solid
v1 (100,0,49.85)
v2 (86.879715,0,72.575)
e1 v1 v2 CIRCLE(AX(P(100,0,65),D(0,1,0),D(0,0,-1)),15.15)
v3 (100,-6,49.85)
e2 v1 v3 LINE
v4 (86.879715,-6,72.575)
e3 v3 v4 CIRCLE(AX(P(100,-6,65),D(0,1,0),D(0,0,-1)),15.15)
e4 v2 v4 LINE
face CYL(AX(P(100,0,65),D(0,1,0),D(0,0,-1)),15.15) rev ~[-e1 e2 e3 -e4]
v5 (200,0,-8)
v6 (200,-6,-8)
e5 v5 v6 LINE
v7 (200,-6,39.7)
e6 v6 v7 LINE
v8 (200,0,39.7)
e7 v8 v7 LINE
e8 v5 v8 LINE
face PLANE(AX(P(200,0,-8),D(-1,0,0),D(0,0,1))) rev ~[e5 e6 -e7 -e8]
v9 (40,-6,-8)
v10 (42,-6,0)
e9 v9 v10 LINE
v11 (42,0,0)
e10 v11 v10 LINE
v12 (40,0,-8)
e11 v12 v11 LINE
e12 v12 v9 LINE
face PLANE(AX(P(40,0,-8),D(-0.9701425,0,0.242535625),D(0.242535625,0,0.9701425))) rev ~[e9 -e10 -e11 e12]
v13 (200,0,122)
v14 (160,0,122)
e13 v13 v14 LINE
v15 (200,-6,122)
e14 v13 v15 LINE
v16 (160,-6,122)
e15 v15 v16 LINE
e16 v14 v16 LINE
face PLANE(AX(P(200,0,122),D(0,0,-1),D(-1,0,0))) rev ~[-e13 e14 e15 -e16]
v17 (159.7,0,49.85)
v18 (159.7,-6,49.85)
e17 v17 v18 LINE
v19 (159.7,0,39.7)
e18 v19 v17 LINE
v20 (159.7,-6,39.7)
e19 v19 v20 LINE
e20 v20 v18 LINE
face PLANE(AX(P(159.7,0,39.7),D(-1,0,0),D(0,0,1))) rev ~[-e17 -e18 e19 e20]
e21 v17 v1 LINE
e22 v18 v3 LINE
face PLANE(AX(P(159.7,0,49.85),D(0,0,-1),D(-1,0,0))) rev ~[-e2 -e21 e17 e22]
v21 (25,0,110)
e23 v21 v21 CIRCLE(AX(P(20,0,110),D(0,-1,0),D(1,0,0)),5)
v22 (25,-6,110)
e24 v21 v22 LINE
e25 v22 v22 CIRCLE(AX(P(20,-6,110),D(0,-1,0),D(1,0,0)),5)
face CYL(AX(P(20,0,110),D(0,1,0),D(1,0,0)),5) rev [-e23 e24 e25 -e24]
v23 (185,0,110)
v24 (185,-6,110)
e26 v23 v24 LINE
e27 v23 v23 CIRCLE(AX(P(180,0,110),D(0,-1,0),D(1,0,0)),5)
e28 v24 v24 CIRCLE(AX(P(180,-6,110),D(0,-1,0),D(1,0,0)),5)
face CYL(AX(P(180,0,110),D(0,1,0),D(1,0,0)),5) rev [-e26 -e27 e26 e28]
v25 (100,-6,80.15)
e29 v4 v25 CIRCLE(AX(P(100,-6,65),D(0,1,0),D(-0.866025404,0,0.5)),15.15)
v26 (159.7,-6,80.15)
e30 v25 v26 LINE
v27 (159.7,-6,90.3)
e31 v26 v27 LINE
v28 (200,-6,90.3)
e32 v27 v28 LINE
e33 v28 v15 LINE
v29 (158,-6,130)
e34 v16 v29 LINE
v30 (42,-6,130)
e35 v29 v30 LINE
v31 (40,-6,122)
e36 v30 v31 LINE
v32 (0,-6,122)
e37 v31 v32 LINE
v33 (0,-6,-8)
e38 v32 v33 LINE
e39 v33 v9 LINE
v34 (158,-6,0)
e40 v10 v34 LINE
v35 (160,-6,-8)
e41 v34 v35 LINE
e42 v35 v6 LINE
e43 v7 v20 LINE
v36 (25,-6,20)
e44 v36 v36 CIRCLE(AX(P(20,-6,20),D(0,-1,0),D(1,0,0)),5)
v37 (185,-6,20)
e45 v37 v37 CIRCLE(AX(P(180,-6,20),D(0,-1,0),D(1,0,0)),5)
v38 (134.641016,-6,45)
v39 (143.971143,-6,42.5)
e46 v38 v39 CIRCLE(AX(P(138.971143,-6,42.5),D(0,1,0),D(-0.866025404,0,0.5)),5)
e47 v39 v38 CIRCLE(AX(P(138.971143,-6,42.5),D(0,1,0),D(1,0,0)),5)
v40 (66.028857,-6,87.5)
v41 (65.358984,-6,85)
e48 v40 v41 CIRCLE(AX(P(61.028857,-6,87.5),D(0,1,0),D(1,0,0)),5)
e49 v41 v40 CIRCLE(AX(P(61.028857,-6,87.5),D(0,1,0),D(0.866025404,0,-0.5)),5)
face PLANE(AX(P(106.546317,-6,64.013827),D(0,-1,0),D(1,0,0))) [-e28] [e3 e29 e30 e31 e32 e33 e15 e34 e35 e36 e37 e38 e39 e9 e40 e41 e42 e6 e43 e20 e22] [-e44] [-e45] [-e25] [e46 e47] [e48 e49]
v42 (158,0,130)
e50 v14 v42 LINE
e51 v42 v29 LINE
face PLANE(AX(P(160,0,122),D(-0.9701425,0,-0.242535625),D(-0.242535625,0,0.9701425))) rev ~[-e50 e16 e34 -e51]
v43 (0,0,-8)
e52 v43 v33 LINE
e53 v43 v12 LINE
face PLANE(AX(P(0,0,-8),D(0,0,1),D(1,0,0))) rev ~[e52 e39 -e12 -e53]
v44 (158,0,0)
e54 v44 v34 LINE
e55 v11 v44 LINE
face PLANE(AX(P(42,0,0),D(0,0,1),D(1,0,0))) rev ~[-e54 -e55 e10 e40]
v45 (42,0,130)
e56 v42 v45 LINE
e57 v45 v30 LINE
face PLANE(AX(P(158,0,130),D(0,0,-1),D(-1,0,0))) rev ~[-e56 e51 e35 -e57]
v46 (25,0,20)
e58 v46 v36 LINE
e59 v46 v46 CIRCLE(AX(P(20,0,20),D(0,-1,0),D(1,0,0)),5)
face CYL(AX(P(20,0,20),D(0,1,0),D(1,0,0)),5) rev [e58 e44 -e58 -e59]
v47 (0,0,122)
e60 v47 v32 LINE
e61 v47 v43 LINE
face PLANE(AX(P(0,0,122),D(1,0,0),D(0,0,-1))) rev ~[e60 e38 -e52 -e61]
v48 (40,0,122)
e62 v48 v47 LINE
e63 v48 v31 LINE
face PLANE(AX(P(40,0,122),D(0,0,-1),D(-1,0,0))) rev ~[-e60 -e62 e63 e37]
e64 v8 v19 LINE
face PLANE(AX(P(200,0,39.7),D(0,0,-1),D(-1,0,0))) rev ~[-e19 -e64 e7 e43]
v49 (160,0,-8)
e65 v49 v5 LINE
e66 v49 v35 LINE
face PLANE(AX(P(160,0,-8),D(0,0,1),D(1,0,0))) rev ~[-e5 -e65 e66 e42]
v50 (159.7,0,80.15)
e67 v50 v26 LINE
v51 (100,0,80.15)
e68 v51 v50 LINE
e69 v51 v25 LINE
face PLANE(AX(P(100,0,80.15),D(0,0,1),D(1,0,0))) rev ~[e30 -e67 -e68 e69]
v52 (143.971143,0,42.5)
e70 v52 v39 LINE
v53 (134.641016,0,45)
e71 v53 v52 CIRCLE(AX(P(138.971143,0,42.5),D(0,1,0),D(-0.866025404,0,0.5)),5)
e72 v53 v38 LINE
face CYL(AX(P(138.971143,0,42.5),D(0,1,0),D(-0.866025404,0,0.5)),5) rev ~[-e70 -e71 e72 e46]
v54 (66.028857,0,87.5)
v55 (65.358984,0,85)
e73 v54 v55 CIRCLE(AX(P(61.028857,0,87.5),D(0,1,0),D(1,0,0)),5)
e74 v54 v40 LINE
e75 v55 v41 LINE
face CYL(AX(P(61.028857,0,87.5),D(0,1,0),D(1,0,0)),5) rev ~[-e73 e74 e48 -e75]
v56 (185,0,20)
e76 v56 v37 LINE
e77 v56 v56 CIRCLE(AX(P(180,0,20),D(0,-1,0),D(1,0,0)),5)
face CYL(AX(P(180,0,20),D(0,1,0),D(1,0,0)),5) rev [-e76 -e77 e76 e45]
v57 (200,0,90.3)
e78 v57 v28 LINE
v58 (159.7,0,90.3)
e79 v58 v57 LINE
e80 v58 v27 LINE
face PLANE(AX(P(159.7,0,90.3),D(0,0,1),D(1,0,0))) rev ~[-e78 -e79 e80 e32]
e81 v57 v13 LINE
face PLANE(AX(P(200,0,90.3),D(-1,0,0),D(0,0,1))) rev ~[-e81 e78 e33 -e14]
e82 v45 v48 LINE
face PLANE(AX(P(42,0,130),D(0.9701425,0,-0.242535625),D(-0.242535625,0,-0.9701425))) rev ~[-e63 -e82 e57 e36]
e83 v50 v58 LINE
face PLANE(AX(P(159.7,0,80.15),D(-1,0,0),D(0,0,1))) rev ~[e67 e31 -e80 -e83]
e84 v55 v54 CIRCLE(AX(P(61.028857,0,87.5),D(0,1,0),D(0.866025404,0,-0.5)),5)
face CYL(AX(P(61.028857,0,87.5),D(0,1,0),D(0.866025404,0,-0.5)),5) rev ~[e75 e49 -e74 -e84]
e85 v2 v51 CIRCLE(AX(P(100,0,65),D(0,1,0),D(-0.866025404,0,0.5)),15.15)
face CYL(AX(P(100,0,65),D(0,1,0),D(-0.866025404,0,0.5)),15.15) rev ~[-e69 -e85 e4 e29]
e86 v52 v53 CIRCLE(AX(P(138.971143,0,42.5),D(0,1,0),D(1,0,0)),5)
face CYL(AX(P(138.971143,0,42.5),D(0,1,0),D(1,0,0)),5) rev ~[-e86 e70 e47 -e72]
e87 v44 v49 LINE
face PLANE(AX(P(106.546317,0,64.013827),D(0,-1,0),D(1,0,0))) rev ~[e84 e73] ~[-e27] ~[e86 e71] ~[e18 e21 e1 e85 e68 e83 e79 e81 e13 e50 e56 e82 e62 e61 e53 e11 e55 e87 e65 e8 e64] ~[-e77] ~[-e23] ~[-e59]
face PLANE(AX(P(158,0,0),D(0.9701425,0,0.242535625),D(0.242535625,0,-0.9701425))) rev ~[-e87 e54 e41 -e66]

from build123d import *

# Parameters (mm, degrees)
F0_R     = 5
F0_W     = 40
F0_H     = 8
F1_DEPTH = 6


# Not quite as in the source:
# - a feature names something its author has since deleted; it is built from what else it names


with BuildPart() as f1:
    # F0 (on Front) → F1 (new body)
    with BuildSketch(Plane.XZ):
        with BuildLine():
            Line((0, 122), (0, 0))
            Line((0, 0), (40, 0))
            Line((40, 0), (42, 0))
            Line((42, 0), (158, 0))
            Line((158, 0), (160, 0))
            Line((160, 0), (200, 0))
            Line((200, 0), (200, 39.7))
            Line((200, 39.7), (159.7, 39.7))
            Line((159.7, 39.7), (159.7, 49.85))
            Line((159.7, 49.85), (126.2405697347, 49.85))
            Line((126.2405697347, 49.85), (100, 49.85))
            ThreePointArc((100, 49.85), (86.8797151327, 57.425), (86.8797151327, 72.575))
            ThreePointArc((86.8797151327, 72.575), (92.425, 78.1202848673), (100, 80.15))
            Line((100, 80.15), (159.7, 80.15))
            Line((159.7, 80.15), (159.7, 90.3))
            Line((159.7, 90.3), (200, 90.3))
            Line((200, 90.3), (200, 122))
            Line((200, 122), (160, 122))
            Line((160, 122), (158, 130))
            Line((158, 130), (42, 130))
            Line((42, 130), (40, 122))
            Line((40, 122), (0, 122))
        make_face()
        with Locations((20, 20)):
            Circle(F0_R, mode=Mode.SUBTRACT)
        with Locations((180, 20)):
            Circle(F0_R, mode=Mode.SUBTRACT)
        with BuildLine():
            ThreePointArc((143.9711431703, 42.5), (137.6770479448, 37.6703708686), (134.6410161514, 45))
            ThreePointArc((134.6410161514, 45), (140.2652383958, 47.3296291314), (143.9711431703, 42.5))
        make_face(mode=Mode.SUBTRACT)
        with BuildLine():
            ThreePointArc((66.0288568297, 87.5), (65.8584859611, 86.2059047745), (65.3589838486, 85))
            ThreePointArc((65.3589838486, 85), (56.1992276983, 88.7940952255), (66.0288568297, 87.5))
        make_face(mode=Mode.SUBTRACT)
        with Locations((20, 110)):
            Circle(F0_R, mode=Mode.SUBTRACT)
        with Locations((180, 110)):
            Circle(F0_R, mode=Mode.SUBTRACT)
        with Locations((20, -4)):
            Rectangle(F0_W, F0_H)
        with Locations((180, -4)):
            Rectangle(F0_W, F0_H)
        Polygon((42, 0), (40, 0), (40, -8), align=None)
        Polygon((160, 0), (158, 0), (160, -8), align=None)
    extrude(amount=F1_DEPTH)


solid = f1.part
